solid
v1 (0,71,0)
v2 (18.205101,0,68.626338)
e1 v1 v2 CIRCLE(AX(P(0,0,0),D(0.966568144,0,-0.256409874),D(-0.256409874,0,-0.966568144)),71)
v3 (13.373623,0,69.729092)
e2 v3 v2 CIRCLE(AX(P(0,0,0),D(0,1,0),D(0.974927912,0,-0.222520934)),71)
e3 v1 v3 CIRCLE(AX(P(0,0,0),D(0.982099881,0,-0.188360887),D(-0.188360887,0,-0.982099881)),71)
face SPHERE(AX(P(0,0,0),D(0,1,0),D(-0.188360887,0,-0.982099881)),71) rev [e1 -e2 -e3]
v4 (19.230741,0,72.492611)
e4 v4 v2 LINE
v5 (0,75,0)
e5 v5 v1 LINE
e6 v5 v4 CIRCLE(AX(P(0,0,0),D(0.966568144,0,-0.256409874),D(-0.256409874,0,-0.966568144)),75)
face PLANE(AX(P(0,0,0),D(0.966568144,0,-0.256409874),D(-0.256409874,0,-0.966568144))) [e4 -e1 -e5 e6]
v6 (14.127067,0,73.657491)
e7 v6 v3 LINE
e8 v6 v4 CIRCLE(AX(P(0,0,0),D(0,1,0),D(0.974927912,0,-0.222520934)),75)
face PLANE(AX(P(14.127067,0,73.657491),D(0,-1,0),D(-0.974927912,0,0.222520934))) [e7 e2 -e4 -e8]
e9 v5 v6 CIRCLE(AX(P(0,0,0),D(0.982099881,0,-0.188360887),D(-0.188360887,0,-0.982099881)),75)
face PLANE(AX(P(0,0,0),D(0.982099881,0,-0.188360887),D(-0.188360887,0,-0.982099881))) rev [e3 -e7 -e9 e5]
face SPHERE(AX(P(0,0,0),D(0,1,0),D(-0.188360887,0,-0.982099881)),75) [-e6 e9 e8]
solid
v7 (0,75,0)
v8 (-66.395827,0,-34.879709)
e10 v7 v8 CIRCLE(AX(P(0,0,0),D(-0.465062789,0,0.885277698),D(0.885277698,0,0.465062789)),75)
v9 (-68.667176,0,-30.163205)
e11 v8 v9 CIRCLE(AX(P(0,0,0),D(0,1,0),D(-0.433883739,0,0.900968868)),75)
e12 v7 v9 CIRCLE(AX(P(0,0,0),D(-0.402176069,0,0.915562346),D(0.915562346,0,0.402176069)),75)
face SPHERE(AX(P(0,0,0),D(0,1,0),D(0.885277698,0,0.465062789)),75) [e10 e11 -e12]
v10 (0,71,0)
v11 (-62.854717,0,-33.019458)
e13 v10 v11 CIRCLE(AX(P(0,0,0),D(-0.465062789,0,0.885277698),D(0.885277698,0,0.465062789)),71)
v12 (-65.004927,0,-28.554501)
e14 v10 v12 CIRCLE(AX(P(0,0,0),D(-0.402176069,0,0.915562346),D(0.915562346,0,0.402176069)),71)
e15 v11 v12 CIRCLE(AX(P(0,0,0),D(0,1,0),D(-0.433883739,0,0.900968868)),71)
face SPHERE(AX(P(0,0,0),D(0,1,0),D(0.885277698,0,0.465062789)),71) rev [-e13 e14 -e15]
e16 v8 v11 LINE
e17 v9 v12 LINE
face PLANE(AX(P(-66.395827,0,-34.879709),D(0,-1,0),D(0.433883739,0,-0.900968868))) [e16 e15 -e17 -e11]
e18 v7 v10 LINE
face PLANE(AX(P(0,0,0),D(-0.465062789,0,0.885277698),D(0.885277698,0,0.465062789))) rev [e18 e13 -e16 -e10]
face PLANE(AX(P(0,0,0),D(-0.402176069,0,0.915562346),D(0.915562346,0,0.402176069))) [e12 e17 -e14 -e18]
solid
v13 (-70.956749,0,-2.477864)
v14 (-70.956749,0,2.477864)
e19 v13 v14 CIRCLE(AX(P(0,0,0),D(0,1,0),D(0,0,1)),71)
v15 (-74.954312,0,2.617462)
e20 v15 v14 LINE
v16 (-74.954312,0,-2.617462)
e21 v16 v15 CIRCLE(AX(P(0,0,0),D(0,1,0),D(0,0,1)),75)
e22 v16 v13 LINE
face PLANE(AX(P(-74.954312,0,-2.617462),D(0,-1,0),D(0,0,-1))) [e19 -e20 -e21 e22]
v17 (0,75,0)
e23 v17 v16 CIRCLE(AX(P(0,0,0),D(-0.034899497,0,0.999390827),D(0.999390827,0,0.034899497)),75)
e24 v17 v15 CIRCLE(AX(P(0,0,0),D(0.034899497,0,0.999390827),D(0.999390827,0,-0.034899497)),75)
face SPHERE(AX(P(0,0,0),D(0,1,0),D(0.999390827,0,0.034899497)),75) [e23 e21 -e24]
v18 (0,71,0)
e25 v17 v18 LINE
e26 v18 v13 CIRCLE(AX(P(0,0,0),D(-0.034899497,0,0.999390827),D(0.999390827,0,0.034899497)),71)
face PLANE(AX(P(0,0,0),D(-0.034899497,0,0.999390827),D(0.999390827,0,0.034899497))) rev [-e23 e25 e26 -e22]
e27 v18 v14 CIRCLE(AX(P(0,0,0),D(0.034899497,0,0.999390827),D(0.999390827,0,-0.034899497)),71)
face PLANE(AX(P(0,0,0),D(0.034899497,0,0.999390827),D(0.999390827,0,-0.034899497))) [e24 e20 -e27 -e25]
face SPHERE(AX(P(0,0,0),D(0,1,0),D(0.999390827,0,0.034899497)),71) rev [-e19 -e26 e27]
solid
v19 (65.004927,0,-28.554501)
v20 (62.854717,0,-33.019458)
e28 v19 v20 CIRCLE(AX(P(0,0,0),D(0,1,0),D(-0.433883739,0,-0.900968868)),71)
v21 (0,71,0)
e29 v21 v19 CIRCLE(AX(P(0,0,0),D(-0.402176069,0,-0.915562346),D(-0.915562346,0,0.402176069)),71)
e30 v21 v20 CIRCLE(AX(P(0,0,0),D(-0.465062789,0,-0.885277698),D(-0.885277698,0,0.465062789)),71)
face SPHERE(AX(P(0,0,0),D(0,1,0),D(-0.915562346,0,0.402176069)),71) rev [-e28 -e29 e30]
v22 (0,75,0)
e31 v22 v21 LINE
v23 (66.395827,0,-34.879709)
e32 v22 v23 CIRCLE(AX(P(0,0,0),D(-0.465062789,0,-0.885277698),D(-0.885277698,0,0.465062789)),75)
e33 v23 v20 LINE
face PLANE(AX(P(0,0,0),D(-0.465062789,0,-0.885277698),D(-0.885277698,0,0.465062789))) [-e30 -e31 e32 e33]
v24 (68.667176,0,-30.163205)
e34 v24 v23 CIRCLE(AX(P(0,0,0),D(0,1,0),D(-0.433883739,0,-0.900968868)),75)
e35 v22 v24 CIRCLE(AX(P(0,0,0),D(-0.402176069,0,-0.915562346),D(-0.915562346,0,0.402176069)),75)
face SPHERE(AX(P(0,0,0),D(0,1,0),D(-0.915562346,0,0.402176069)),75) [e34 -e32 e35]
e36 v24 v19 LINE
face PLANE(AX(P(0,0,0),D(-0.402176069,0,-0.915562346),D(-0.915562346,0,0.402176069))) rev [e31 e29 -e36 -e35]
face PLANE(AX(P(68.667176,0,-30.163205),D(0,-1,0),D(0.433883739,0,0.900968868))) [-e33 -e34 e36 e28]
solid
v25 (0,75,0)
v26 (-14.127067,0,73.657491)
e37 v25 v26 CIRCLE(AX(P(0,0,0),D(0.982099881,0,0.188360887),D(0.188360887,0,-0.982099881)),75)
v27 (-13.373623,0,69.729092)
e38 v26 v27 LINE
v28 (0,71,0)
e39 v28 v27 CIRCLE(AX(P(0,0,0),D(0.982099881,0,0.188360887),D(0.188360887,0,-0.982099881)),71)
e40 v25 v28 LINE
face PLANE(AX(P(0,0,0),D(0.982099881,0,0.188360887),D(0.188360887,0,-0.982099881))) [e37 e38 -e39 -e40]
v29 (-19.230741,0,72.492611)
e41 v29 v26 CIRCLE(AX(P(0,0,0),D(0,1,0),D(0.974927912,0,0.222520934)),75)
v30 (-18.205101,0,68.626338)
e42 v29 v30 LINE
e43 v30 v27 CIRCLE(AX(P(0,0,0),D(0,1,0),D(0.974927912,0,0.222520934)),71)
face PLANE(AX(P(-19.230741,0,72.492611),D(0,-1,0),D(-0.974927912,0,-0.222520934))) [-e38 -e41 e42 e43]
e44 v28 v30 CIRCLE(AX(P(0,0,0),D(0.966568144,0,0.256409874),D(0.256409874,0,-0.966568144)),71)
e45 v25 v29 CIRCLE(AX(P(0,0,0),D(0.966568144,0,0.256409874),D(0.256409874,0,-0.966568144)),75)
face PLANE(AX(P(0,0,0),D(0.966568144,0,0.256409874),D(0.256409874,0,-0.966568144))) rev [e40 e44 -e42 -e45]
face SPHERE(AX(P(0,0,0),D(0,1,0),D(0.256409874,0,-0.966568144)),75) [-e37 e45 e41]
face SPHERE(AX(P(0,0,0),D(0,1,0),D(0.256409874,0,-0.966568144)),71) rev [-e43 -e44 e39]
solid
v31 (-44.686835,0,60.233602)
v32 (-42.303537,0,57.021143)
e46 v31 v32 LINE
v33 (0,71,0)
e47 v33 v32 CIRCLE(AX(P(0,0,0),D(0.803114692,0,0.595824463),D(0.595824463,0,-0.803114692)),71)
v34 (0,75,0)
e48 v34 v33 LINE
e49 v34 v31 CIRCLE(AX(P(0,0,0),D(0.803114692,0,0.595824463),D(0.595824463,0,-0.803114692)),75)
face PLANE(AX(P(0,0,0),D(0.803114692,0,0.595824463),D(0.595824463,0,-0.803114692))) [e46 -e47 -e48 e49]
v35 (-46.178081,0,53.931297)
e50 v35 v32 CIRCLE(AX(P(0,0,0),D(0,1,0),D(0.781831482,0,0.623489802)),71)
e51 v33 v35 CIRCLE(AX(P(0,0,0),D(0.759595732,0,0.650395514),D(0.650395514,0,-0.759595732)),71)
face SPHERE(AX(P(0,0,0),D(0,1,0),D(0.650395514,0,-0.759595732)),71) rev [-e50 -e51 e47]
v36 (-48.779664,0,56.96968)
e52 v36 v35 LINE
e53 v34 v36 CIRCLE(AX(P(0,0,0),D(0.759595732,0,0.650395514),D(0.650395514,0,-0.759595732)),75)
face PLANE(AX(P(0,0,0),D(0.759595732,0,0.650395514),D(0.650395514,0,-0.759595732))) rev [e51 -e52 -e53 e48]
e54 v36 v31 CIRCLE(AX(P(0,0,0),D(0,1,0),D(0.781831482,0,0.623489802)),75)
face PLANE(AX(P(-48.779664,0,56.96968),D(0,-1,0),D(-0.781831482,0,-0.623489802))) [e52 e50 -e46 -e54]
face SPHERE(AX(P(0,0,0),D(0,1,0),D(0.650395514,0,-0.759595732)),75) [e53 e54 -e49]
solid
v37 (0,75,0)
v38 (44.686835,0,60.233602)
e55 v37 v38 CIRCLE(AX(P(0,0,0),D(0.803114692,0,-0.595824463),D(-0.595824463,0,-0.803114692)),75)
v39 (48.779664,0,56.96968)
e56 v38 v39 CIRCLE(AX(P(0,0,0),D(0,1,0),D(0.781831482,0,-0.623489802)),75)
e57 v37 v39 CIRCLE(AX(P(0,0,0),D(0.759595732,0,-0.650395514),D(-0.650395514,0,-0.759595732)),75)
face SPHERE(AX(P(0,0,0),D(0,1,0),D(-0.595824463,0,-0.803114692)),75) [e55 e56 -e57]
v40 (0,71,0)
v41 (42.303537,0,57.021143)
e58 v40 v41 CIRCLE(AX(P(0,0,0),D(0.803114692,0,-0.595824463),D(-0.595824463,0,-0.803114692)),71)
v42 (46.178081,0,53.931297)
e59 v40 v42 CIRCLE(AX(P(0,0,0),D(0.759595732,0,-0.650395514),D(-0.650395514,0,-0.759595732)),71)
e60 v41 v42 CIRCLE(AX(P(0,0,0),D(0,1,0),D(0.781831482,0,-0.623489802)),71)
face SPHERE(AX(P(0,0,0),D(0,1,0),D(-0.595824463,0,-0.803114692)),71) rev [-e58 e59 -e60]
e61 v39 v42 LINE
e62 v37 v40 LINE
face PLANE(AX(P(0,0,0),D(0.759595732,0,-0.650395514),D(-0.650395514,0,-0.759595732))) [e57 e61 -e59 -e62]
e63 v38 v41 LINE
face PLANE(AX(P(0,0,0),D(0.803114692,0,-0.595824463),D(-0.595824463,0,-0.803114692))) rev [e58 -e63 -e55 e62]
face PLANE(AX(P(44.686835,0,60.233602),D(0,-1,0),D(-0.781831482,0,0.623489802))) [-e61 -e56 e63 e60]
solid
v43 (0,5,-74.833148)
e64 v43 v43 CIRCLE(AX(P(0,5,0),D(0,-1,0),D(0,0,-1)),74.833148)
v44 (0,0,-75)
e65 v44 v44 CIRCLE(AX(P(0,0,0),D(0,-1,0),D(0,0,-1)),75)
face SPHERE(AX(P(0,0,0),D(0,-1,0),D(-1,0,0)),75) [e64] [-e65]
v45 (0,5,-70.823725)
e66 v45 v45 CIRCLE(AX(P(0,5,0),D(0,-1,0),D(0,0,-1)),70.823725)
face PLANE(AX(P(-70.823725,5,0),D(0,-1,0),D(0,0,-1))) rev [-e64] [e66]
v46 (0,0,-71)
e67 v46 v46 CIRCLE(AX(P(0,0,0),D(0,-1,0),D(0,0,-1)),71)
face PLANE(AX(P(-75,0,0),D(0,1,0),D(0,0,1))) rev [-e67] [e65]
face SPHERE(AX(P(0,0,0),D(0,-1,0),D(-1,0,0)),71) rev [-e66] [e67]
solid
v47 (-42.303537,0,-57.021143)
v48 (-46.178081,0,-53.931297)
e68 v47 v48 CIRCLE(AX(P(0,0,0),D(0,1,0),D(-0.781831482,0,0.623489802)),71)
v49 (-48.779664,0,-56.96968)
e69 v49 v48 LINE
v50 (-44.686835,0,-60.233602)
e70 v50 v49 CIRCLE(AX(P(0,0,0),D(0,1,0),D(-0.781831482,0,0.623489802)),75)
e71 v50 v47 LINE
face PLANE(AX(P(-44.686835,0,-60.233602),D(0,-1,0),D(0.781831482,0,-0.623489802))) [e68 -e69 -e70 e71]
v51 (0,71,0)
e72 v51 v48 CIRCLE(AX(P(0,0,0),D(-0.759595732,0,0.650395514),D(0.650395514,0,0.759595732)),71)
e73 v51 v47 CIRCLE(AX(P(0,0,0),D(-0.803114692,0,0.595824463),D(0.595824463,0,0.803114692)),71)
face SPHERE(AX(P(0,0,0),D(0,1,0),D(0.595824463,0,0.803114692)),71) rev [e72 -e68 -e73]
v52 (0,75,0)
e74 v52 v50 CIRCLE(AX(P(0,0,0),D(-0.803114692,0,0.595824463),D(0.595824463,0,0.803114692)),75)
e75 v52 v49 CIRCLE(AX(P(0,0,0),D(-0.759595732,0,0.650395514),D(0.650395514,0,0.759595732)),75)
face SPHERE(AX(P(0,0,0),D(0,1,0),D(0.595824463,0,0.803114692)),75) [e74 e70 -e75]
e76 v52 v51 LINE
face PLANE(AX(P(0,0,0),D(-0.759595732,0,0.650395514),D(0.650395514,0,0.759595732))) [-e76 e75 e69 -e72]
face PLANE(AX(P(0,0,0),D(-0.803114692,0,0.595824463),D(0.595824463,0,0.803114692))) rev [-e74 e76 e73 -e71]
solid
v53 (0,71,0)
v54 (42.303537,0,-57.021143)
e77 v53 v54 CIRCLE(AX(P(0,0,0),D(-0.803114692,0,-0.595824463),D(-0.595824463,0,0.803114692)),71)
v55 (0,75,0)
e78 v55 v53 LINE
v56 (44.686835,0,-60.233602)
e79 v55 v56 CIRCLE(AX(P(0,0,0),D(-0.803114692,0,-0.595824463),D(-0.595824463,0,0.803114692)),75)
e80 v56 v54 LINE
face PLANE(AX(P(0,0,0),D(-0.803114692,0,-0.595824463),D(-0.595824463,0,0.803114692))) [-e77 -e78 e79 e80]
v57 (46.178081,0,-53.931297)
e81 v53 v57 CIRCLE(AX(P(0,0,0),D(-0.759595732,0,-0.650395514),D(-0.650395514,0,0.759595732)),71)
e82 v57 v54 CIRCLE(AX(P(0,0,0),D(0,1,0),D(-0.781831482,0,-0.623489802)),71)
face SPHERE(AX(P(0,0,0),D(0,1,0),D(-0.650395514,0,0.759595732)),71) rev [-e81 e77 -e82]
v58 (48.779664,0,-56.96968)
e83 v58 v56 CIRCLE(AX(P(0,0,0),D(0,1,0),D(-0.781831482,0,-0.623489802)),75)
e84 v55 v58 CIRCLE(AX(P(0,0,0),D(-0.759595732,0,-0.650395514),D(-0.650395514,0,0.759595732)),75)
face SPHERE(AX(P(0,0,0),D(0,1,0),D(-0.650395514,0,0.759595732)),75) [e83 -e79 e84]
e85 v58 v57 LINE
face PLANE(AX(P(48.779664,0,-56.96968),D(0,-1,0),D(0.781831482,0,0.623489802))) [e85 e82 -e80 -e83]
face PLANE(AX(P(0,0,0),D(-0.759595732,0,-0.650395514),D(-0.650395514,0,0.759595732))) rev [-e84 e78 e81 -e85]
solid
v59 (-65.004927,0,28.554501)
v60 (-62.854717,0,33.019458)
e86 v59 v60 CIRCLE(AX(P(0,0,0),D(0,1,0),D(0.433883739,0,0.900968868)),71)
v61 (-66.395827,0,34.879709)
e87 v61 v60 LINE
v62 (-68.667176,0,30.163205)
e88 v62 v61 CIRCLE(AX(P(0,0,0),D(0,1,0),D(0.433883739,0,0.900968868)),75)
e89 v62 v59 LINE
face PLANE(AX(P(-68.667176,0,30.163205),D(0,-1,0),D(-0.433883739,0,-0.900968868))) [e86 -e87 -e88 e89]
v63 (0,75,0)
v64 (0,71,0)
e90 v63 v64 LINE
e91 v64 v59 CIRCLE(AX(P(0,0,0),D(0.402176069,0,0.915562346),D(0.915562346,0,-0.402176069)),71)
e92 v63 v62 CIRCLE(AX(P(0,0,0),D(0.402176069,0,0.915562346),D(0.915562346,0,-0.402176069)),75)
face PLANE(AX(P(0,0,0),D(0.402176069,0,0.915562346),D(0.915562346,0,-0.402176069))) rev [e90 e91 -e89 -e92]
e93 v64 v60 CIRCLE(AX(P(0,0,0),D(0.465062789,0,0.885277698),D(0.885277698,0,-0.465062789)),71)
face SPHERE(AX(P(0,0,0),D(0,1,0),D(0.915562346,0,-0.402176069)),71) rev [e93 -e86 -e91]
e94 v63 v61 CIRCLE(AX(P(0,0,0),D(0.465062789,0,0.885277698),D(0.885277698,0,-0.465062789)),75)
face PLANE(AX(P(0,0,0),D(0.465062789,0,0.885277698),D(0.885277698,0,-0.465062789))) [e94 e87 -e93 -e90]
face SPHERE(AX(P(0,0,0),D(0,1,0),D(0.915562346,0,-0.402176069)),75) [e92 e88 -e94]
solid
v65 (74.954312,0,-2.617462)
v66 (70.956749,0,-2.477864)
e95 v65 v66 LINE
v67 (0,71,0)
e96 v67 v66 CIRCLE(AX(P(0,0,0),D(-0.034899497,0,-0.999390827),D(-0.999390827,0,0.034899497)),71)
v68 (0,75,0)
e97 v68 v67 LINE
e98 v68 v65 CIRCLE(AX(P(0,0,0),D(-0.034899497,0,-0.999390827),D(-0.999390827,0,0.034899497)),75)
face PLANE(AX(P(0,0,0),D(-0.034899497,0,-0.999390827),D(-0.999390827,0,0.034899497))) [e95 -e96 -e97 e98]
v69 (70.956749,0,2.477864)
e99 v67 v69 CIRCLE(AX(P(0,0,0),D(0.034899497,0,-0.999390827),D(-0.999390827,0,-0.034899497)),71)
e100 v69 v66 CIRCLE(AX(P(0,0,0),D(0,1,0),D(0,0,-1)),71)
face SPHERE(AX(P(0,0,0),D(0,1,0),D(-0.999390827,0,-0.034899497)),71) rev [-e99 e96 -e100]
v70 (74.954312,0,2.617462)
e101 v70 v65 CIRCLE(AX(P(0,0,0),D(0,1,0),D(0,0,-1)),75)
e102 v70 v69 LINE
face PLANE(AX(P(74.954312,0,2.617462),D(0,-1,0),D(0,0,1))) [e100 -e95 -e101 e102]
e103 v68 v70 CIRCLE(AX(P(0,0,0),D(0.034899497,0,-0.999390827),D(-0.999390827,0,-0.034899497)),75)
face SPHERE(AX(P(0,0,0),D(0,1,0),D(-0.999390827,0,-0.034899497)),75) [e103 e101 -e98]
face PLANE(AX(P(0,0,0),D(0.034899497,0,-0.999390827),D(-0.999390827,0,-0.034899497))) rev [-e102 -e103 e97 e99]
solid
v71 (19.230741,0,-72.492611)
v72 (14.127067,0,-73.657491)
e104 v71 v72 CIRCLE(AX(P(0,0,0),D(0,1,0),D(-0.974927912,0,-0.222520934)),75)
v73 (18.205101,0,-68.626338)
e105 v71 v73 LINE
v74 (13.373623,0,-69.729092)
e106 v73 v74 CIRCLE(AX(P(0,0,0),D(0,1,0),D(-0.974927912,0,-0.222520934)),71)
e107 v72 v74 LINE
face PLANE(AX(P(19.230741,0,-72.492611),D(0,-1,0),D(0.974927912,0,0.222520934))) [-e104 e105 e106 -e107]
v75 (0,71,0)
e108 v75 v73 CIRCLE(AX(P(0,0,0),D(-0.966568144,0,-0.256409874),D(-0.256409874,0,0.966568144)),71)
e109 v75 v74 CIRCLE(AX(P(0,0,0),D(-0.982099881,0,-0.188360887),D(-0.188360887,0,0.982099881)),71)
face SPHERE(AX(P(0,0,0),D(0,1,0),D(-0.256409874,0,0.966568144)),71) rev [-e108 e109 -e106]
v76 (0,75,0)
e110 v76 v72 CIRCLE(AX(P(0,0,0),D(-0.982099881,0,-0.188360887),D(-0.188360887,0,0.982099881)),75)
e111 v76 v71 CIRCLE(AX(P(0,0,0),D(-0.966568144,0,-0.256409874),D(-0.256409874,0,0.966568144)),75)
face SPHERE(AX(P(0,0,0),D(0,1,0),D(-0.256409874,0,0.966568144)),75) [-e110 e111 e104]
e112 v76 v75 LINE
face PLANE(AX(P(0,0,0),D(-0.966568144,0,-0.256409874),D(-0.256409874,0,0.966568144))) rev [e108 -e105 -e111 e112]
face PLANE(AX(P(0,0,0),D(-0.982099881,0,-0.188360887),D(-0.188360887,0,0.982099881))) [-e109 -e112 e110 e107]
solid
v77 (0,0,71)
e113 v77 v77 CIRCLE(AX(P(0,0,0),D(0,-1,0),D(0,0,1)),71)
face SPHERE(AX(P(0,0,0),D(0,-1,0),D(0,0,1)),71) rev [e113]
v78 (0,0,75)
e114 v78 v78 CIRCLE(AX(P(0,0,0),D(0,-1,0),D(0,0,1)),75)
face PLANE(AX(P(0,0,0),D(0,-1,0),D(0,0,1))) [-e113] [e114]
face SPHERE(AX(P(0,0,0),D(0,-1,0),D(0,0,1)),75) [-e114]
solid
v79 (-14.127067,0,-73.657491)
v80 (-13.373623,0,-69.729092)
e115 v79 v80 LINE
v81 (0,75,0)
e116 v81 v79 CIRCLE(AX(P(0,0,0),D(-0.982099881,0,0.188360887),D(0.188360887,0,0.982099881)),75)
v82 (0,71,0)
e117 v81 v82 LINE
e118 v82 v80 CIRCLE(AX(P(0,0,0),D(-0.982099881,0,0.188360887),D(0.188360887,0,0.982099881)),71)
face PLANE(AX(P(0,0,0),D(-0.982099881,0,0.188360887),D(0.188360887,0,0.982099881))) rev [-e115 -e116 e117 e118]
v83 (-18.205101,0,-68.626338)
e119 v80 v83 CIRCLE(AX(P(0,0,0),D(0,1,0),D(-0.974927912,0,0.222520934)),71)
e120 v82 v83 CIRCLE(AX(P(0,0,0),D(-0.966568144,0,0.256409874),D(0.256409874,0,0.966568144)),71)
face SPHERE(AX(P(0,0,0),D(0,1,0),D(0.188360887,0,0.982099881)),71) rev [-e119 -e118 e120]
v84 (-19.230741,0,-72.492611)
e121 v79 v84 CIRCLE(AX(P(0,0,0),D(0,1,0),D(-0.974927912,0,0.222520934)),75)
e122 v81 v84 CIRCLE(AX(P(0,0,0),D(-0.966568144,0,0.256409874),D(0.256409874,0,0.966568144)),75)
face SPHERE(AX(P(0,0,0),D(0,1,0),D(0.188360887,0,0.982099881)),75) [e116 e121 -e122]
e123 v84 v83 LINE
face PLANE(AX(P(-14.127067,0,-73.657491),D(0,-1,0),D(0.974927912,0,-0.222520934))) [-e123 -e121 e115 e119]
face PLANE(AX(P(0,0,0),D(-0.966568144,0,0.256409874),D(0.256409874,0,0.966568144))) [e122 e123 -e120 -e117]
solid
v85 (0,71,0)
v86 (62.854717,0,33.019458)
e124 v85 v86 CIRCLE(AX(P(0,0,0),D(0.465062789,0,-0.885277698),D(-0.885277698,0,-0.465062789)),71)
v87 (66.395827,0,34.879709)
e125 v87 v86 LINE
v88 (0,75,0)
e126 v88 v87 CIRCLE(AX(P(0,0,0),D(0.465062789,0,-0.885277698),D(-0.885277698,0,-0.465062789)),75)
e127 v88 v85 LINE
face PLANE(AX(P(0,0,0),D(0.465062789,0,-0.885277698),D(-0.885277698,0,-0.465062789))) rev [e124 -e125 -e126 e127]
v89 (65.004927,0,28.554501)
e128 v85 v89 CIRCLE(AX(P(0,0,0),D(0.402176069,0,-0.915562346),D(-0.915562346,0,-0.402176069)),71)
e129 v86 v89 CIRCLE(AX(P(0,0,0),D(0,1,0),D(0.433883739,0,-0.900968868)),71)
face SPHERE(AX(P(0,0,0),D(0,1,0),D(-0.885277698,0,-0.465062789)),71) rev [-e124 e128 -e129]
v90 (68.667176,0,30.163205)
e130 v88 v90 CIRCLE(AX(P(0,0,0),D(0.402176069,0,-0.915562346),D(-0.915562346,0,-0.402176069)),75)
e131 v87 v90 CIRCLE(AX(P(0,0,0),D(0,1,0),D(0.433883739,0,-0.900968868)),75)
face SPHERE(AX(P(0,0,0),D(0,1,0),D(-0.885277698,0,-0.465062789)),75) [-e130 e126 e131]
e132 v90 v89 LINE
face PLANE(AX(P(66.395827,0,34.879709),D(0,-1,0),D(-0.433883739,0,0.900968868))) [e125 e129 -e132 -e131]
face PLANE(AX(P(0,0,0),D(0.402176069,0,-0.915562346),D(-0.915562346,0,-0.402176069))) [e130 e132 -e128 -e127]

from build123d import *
from build123d.topology import SkipClean

# Parameters (mm, degrees)
SHELL_ANGLE              = 180
REVOLVE1_ANGLE           = 2
REVOLVE1_OTHER_WAY_ANGLE = 2
CIRPATTERN1_COUNT        = 14


with BuildPart() as part:
    # Sketch9 → Shell (revolve)
    with BuildSketch(Plane(origin=(0, 0, 0), x_dir=(1, 0, 0), z_dir=(0, 1, 0))):
        with BuildLine():
            Line((0, 75), (0, 71))
            ThreePointArc((0, 71), (-71, 0), (0, -71))
            Line((0, -71), (0, -75))
            ThreePointArc((0, -75), (-75, 0), (0, 75))
        make_face()
    revolve(axis=Axis((0, 0, -75), (0, 0, -1)), revolution_arc=SHELL_ANGLE)


with BuildPart() as body_2:
    # Sketch4 → Base (revolve)
    with BuildSketch(Plane.XY, mode=Mode.PRIVATE) as base_sk:
        with BuildLine():
            Line((-75, 0), (-71, 0))
            ThreePointArc((-71, 0), (-70.955918, 2.501553), (-70.823725, 5))
            Line((-70.823725, 5), (-74.833148, 5))
            ThreePointArc((-74.833148, 5), (-74.958275, 2.501392), (-75, 0))
        make_face()
    revolve(base_sk.sketch.rotate(Axis((0, 0, 0), (0, 1, 0)), 90), axis=Axis((0, 0, 0), (0, 1, 0)))


with BuildPart() as body_3:
    # Sketch10 → Revolve1 (revolve)
    with BuildSketch(Plane.XY):
        with BuildLine():
            Line((-75, 0), (-71, 0))
            ThreePointArc((-71, 0), (-50.204581, 50.204581), (0, 71))
            Line((0, 71), (0, 75))
            ThreePointArc((0, 75), (-53.033009, 53.033009), (-75, 0))
        make_face()
    revolve(axis=Axis((0, 77.348181, 0), (0, 1, 0)), revolution_arc=REVOLVE1_ANGLE)

    # Sketch10 → Revolve1 other way (revolve)
    with SkipClean():  # the faces are left unmerged after this step: merging them gives an invalid solid
        with BuildSketch(Plane.XY):
            with BuildLine():
                Line((-75, 0), (-71, 0))
                ThreePointArc((-71, 0), (-50.204581, 50.204581), (0, 71))
                Line((0, 71), (0, 75))
                ThreePointArc((0, 75), (-53.033009, 53.033009), (-75, 0))
            make_face()
        revolve(axis=Axis((0, 77.348181, 0), (0, -1, 0)), revolution_arc=REVOLVE1_OTHER_WAY_ANGLE)


with BuildPart() as cirpattern1_1:
    # CirPattern1: pattern copy
    add(body_3.part.rotate(Axis((0, 0, 0), (0, 1, 0)), 1 * 360 / CIRPATTERN1_COUNT))


with BuildPart() as cirpattern1_2:
    # CirPattern1: pattern copy
    add(body_3.part.rotate(Axis((0, 0, 0), (0, 1, 0)), 2 * 360 / CIRPATTERN1_COUNT))


with BuildPart() as cirpattern1_3:
    # CirPattern1: pattern copy
    add(body_3.part.rotate(Axis((0, 0, 0), (0, 1, 0)), 3 * 360 / CIRPATTERN1_COUNT))


with BuildPart() as cirpattern1_4:
    # CirPattern1: pattern copy
    add(body_3.part.rotate(Axis((0, 0, 0), (0, 1, 0)), 4 * 360 / CIRPATTERN1_COUNT))


with BuildPart() as cirpattern1_5:
    # CirPattern1: pattern copy
    add(body_3.part.rotate(Axis((0, 0, 0), (0, 1, 0)), 5 * 360 / CIRPATTERN1_COUNT))


with BuildPart() as cirpattern1_6:
    # CirPattern1: pattern copy
    add(body_3.part.rotate(Axis((0, 0, 0), (0, 1, 0)), 6 * 360 / CIRPATTERN1_COUNT))


with BuildPart() as cirpattern1_7:
    # CirPattern1: pattern copy
    add(body_3.part.rotate(Axis((0, 0, 0), (0, 1, 0)), 7 * 360 / CIRPATTERN1_COUNT))


with BuildPart() as cirpattern1_8:
    # CirPattern1: pattern copy
    add(body_3.part.rotate(Axis((0, 0, 0), (0, 1, 0)), 8 * 360 / CIRPATTERN1_COUNT))


with BuildPart() as cirpattern1_9:
    # CirPattern1: pattern copy
    add(body_3.part.rotate(Axis((0, 0, 0), (0, 1, 0)), 9 * 360 / CIRPATTERN1_COUNT))


with BuildPart() as cirpattern1_10:
    # CirPattern1: pattern copy
    add(body_3.part.rotate(Axis((0, 0, 0), (0, 1, 0)), 10 * 360 / CIRPATTERN1_COUNT))


with BuildPart() as cirpattern1_11:
    # CirPattern1: pattern copy
    add(body_3.part.rotate(Axis((0, 0, 0), (0, 1, 0)), 11 * 360 / CIRPATTERN1_COUNT))


with BuildPart() as cirpattern1_12:
    # CirPattern1: pattern copy
    add(body_3.part.rotate(Axis((0, 0, 0), (0, 1, 0)), 12 * 360 / CIRPATTERN1_COUNT))


with BuildPart() as cirpattern1_13:
    # CirPattern1: pattern copy
    add(body_3.part.rotate(Axis((0, 0, 0), (0, 1, 0)), 13 * 360 / CIRPATTERN1_COUNT))


solid = Compound([part.part, body_2.part, body_3.part, cirpattern1_1.part, cirpattern1_2.part, cirpattern1_3.part, cirpattern1_4.part, cirpattern1_5.part, cirpattern1_6.part, cirpattern1_7.part, cirpattern1_8.part, cirpattern1_9.part, cirpattern1_10.part, cirpattern1_11.part, cirpattern1_12.part, cirpattern1_13.part])
